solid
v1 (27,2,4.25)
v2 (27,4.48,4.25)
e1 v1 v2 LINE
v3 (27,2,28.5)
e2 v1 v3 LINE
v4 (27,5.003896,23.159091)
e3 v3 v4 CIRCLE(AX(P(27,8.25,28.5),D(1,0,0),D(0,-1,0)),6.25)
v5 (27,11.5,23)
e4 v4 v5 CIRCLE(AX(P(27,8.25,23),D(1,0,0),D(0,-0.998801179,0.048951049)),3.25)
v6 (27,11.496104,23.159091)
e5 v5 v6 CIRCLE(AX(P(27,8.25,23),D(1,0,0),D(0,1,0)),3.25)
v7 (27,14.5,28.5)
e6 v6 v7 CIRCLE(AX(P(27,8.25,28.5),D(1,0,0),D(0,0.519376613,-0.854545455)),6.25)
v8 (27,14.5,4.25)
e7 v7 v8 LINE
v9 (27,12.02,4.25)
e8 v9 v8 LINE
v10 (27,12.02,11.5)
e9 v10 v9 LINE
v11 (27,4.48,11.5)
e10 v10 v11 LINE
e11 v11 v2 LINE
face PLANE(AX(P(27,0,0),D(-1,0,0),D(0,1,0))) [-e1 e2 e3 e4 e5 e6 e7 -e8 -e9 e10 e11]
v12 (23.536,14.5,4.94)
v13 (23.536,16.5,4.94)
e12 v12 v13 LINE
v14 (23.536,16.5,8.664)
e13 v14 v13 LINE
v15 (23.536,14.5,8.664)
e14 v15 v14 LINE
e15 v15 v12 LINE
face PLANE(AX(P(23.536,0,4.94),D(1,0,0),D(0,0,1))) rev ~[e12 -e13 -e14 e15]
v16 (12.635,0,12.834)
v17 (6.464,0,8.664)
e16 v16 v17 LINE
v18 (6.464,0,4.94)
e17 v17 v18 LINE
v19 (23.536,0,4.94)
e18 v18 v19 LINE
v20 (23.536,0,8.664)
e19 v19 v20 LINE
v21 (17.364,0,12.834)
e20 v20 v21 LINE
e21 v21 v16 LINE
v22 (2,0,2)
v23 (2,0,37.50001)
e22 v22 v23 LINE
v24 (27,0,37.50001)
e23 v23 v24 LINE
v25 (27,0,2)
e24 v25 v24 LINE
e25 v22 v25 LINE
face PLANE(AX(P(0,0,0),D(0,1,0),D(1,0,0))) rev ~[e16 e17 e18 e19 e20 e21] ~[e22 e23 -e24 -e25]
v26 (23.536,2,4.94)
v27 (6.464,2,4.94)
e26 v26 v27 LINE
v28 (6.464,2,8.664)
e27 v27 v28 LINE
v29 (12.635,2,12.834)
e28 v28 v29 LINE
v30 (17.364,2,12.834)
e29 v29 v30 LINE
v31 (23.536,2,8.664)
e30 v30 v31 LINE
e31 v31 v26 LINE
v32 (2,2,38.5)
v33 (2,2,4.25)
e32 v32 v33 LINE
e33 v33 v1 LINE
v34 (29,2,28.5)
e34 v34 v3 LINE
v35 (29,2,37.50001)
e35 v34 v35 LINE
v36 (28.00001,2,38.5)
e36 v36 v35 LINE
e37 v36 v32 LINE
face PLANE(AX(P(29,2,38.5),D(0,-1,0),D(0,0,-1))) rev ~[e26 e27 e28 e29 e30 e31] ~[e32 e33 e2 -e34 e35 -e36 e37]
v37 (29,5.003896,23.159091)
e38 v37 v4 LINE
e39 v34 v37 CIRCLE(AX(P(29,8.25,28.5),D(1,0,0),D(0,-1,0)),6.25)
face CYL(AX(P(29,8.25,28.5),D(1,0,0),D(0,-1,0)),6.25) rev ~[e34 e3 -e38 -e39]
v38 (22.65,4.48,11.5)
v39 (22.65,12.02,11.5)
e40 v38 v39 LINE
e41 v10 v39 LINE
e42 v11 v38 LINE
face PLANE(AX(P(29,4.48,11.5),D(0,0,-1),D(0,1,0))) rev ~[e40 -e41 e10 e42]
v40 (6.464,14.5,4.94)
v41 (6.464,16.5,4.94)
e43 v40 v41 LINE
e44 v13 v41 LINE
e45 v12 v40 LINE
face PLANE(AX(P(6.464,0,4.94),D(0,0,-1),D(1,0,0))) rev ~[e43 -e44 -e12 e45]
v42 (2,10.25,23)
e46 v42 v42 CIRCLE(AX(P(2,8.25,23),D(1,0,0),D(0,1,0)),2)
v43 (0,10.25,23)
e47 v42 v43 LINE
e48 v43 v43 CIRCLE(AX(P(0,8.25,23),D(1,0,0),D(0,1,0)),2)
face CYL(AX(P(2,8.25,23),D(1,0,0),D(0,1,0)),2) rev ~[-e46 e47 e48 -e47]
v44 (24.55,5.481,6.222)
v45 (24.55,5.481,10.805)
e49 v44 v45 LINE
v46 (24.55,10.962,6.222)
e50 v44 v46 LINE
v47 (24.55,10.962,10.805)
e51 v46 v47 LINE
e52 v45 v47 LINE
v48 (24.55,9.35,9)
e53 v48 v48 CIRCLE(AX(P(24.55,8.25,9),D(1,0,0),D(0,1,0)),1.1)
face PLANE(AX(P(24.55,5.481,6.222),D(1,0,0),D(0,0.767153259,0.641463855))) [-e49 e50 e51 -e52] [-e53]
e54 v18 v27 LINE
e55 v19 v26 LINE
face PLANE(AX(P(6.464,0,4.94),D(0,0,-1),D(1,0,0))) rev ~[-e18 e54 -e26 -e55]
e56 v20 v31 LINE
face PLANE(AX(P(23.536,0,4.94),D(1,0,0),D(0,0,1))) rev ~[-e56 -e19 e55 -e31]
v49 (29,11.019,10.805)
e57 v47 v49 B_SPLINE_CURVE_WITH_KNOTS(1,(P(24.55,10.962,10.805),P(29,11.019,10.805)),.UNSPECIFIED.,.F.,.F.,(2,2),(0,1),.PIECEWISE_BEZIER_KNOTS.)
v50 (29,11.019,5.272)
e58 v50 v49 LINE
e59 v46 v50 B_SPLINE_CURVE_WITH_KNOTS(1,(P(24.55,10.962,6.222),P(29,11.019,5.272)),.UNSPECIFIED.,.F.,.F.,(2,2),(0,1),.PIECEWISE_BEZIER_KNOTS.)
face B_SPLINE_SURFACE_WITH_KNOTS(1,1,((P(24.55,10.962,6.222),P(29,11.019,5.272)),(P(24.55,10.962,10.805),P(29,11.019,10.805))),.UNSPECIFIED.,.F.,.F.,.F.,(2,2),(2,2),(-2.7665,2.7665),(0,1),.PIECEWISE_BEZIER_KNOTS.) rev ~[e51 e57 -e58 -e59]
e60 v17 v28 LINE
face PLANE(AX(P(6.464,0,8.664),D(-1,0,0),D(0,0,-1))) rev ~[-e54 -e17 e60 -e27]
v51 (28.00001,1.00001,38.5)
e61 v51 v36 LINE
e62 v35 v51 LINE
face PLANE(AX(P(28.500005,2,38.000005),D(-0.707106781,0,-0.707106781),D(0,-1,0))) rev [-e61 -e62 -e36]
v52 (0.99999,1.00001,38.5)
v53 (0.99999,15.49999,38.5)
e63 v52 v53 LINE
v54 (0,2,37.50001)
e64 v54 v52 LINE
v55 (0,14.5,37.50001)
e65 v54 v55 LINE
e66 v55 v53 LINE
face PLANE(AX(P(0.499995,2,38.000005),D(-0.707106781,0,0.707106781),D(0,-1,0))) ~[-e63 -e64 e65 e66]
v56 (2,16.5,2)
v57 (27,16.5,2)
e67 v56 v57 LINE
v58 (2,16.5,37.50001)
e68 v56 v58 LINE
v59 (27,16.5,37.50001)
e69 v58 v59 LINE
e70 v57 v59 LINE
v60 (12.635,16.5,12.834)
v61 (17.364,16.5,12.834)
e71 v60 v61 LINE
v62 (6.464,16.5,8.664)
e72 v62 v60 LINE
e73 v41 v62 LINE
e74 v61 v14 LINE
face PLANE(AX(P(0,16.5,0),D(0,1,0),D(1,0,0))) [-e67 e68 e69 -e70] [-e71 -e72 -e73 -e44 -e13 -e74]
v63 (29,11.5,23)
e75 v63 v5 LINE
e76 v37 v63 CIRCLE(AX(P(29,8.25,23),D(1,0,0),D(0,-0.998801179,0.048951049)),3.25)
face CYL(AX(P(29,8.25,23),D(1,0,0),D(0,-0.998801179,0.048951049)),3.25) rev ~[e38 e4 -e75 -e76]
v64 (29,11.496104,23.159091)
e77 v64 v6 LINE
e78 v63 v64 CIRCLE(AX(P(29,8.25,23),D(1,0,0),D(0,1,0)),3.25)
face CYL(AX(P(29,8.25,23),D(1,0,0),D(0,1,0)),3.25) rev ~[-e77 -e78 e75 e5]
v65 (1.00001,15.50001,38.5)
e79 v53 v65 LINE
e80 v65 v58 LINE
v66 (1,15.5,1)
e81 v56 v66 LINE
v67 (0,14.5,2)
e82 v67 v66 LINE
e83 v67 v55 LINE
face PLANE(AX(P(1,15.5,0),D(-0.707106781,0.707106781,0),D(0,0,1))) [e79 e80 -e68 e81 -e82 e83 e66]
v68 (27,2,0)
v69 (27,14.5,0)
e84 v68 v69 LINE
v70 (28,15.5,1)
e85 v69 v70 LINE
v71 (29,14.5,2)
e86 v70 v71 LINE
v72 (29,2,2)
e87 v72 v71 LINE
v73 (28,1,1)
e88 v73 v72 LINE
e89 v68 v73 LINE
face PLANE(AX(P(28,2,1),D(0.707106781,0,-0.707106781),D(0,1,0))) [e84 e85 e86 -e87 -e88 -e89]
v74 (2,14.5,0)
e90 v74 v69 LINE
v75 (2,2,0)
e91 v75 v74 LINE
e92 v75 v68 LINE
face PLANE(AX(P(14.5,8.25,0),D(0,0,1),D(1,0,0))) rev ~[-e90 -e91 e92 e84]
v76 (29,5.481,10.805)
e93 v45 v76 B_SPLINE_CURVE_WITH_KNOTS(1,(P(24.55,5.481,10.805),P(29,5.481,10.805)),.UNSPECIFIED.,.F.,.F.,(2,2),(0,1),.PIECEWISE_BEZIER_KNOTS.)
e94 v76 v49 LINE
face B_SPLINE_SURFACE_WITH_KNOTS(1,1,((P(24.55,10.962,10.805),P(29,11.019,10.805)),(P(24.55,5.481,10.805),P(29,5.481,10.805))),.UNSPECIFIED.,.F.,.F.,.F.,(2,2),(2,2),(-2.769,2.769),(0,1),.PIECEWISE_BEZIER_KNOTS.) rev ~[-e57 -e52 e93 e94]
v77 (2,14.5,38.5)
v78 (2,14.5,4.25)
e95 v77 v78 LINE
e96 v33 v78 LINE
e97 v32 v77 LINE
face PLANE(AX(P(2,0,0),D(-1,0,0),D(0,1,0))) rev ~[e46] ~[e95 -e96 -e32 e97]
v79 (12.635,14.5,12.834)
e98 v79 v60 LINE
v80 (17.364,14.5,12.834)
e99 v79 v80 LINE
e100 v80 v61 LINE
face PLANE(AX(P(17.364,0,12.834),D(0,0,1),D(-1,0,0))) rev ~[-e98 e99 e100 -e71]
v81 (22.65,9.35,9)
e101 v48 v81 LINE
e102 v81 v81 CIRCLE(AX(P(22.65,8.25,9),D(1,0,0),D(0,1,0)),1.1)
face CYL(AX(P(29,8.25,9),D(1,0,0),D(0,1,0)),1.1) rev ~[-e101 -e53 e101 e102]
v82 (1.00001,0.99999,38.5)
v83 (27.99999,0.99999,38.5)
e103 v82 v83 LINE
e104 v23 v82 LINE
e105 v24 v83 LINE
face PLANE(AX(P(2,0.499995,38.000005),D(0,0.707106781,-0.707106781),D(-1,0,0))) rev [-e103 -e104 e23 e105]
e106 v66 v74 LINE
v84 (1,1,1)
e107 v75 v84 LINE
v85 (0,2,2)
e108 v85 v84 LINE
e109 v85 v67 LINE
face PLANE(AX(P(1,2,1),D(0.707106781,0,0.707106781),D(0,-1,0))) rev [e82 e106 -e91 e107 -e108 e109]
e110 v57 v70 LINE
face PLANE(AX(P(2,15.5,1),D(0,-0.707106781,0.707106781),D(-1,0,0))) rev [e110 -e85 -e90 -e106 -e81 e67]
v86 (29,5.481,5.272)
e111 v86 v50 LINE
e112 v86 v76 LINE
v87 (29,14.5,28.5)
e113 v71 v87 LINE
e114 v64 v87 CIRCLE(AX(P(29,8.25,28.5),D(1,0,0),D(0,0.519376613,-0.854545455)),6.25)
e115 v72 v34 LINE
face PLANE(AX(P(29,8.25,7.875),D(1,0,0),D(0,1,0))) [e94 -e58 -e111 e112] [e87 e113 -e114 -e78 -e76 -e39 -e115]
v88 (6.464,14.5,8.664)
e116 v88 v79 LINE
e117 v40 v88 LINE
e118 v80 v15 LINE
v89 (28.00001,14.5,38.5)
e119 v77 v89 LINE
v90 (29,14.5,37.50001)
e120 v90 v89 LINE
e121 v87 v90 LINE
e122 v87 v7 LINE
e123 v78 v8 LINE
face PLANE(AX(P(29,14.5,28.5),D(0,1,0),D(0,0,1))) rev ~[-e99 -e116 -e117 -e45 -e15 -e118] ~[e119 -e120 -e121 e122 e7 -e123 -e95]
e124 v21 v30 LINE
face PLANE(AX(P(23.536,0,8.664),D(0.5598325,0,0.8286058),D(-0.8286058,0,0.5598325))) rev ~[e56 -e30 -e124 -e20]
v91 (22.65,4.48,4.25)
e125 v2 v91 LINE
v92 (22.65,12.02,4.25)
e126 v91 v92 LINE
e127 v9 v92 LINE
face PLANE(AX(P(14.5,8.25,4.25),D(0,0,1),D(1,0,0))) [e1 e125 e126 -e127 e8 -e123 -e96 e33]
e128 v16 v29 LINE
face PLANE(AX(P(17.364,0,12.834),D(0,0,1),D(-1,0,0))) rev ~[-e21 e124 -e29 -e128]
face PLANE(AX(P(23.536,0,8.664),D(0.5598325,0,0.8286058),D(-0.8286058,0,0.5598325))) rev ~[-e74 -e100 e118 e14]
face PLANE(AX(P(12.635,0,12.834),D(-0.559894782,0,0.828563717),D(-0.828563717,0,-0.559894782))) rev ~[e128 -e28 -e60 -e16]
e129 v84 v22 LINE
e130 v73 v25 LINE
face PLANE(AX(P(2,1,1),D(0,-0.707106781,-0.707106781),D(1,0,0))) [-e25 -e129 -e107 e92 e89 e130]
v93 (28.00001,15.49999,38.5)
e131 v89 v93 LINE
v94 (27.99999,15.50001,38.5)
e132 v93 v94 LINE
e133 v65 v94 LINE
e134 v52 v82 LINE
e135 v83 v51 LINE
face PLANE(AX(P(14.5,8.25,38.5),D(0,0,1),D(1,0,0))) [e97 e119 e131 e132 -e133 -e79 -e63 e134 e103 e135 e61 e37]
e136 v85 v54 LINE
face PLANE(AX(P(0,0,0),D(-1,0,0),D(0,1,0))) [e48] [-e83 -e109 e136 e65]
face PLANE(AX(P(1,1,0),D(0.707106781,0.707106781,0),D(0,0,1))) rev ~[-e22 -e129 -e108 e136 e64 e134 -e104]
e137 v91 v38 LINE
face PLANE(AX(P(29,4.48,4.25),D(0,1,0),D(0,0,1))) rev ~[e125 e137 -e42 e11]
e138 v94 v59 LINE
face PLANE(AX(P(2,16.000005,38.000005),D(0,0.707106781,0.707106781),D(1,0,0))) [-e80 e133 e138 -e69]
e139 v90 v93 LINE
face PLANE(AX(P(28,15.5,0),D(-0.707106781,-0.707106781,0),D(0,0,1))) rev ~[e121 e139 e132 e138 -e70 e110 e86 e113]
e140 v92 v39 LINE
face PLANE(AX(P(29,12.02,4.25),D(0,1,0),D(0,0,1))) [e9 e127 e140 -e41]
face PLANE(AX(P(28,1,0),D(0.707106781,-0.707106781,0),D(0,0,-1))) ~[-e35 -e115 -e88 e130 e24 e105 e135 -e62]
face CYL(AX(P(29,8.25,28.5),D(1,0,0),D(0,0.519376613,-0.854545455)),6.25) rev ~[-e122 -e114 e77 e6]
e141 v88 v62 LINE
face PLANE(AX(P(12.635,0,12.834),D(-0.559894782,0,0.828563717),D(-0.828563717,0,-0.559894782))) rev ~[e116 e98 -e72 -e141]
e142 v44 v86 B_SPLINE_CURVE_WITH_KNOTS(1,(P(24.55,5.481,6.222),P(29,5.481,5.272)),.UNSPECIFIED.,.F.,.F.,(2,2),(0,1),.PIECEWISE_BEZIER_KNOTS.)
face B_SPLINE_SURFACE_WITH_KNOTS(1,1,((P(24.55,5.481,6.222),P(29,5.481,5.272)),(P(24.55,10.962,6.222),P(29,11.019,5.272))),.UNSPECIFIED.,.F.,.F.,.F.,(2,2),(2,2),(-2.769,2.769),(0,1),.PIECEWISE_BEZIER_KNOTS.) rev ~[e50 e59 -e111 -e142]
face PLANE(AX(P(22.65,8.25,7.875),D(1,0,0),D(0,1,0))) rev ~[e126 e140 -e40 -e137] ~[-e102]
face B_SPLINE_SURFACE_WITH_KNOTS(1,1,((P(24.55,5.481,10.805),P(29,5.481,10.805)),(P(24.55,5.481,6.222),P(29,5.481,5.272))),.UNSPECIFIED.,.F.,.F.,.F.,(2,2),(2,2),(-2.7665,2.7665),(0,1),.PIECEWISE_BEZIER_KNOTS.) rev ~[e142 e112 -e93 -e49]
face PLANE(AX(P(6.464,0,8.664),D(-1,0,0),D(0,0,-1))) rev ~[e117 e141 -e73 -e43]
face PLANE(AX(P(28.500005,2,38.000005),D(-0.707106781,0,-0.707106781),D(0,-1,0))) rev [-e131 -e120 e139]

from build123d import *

# Parameters (mm, degrees)
F0_W      = 29
F0_H      = 16.5
F1_DEPTH  = 38.5
F2_T      = -2
F3_DEPTH  = 2.25
F4_SIZE   = 2
F5_SIZE   = 2
F6_SIZE   = 0.99999
F8_DEPTH  = 16.501
F10_DEPTH = 2
F11_R     = 2
F12_DEPTH = 2.001
F13_W     = 7.54
F13_H     = 7.25
F13_R     = 1.1
F14_DEPTH = 6.35
F17_W     = 5.481
F17_H     = 4.583
F15_W     = 5.538
F15_H     = 5.533


# Not quite as in the source:
# - a fillet or chamfer is up to 0.001 mm smaller than in the source, because OpenCascade refuses the exact size


with BuildPart() as f1:
    # F0 (on Top) → F1 (new body)
    with BuildSketch(Plane.XY):
        with Locations((14.5, 8.25)):
            Rectangle(F0_W, F0_H)
    extrude(amount=F1_DEPTH)

    # F2
    f2_openings = [f1.faces().sort_by_distance(p)[0] for p in [
        (14.5, 8.25, 38.5),
    ]]
    offset(amount=F2_T, openings=f2_openings)

    # F3 (add): a face of the model
    f3_faces = [f1.faces().sort_by_distance(p)[0] for p in [
        (14.5, 8.25, 2),
    ]]
    extrude(f3_faces, amount=F3_DEPTH)

    # F4
    f4_edges = [f1.edges().sort_by_distance(p)[0] for p in [
        (29, 0, 19.25),
        (29, 16.5, 19.25),
        (0, 16.5, 19.25),
        (0, 0, 19.25),
    ]]
    chamfer(f4_edges, length=F4_SIZE)

    # F5 (call 1 of 4: OpenCascade refuses the feature's edges together)
    f5_edges = [f1.edges().sort_by_distance(p)[0] for p in [
        (14.5, 16.5, 0),
    ]]
    chamfer(f5_edges, length=F5_SIZE)

    # F5#2 (call 2 of 4)
    f5_2_edges = [f1.edges().sort_by_distance(p)[0] for p in [
        (0, 8.25, 0),
    ]]
    chamfer(f5_2_edges, length=F5_SIZE)

    # F5#3 (call 3 of 4)
    f5_3_edges = [f1.edges().sort_by_distance(p)[0] for p in [
        (14.5, 0, 0),
    ]]
    chamfer(f5_3_edges, length=F5_SIZE)

    # F5#4 (call 4 of 4)
    f5_4_edges = [f1.edges().sort_by_distance(p)[0] for p in [
        (29, 8.25, 0),
    ]]
    chamfer(f5_4_edges, length=F5_SIZE)

    # F6 (size 1 in the source; OpenCascade refuses exactly that, so slightly less here)
    f6_edges = [f1.edges().sort_by_distance(p)[0] for p in [
        (14.5, 16.5, 38.5),
        (0, 8.25, 38.5),
        (14.5, 0, 38.5),
        (29, 8.25, 38.5),
    ]]
    chamfer(f6_edges, length=F6_SIZE)

    # F7 (on face) → F8 (cut, through all)
    with BuildSketch(Plane.XZ):
        Polygon((6.464, 8.664), (6.464, 4.94), (23.536, 4.94), (23.536, 8.664), (17.364, 12.834), (12.635, 12.834), align=None)
    extrude(amount=-F8_DEPTH, mode=Mode.SUBTRACT)

    # F9 (on face) → F10 (cut, through all)
    with BuildSketch(Plane.YZ.offset(29)):
        with BuildLine():
            Line((14.5, 38.5), (2, 38.5))
            Line((2, 38.5), (2, 28.5))
            ThreePointArc((2, 28.5), (8.25, 34.75), (14.5, 28.5))
            Line((14.5, 28.5), (14.5, 38.5))
        make_face()
        with BuildLine():
            ThreePointArc((14.5, 28.5), (8.25, 34.75), (2, 28.5))
            Line((2, 28.5), (14.5, 28.5))
        make_face()
        with BuildLine():
            Line((14.5, 28.5), (2, 28.5))
            ThreePointArc((2, 28.5), (2.8024937382, 25.4361502113), (5.0038961688, 23.1590909091))
            ThreePointArc((5.0038961688, 23.1590909091), (8.25, 26.25), (11.4961038312, 23.1590909091))
            ThreePointArc((11.4961038312, 23.1590909091), (13.6975062618, 25.4361502113), (14.5, 28.5))
        make_face()
        with BuildLine():
            ThreePointArc((11.4961038312, 23.1590909091), (8.25, 26.25), (5.0038961688, 23.1590909091))
            ThreePointArc((5.0038961688, 23.1590909091), (8.25, 22.25), (11.4961038312, 23.1590909091))
        make_face()
        with BuildLine():
            ThreePointArc((11.4961038312, 23.1590909091), (8.25, 22.25), (5.0038961688, 23.1590909091))
            ThreePointArc((5.0038961688, 23.1590909091), (8.1704306945, 19.7509741882), (11.5, 23))
            ThreePointArc((11.5, 23), (11.4990258118, 23.0795693055), (11.4961038312, 23.1590909091))
        make_face()
    extrude(amount=-F10_DEPTH, mode=Mode.SUBTRACT)

    # F11 (on face) → F12 (cut, through all)
    with BuildSketch(Plane.YZ.offset(2)):
        with Locations((8.25, 23)):
            Circle(F11_R)
    extrude(amount=-F12_DEPTH, mode=Mode.SUBTRACT)

    # F13 (on face) → F14 (join)
    with BuildSketch(Plane.YZ.offset(29)):
        with Locations((8.25, 7.875)):
            Rectangle(F13_W, F13_H)
        with Locations((8.25, 9)):
            Circle(F13_R, mode=Mode.SUBTRACT)
    extrude(amount=-F14_DEPTH)

    # F17 (on offset) → F18 section 0
    with BuildSketch(Plane.YZ.offset(24.55)):
        with Locations((8.2215, 8.5135)):
            Rectangle(F17_W, F17_H)
    # F15 (on face) → F18 section 1
    with BuildSketch(Plane.YZ.offset(29)):
        with Locations((8.25, 8.0385)):
            Rectangle(F15_W, F15_H)
    loft(mode=Mode.SUBTRACT)


solid = f1.part
